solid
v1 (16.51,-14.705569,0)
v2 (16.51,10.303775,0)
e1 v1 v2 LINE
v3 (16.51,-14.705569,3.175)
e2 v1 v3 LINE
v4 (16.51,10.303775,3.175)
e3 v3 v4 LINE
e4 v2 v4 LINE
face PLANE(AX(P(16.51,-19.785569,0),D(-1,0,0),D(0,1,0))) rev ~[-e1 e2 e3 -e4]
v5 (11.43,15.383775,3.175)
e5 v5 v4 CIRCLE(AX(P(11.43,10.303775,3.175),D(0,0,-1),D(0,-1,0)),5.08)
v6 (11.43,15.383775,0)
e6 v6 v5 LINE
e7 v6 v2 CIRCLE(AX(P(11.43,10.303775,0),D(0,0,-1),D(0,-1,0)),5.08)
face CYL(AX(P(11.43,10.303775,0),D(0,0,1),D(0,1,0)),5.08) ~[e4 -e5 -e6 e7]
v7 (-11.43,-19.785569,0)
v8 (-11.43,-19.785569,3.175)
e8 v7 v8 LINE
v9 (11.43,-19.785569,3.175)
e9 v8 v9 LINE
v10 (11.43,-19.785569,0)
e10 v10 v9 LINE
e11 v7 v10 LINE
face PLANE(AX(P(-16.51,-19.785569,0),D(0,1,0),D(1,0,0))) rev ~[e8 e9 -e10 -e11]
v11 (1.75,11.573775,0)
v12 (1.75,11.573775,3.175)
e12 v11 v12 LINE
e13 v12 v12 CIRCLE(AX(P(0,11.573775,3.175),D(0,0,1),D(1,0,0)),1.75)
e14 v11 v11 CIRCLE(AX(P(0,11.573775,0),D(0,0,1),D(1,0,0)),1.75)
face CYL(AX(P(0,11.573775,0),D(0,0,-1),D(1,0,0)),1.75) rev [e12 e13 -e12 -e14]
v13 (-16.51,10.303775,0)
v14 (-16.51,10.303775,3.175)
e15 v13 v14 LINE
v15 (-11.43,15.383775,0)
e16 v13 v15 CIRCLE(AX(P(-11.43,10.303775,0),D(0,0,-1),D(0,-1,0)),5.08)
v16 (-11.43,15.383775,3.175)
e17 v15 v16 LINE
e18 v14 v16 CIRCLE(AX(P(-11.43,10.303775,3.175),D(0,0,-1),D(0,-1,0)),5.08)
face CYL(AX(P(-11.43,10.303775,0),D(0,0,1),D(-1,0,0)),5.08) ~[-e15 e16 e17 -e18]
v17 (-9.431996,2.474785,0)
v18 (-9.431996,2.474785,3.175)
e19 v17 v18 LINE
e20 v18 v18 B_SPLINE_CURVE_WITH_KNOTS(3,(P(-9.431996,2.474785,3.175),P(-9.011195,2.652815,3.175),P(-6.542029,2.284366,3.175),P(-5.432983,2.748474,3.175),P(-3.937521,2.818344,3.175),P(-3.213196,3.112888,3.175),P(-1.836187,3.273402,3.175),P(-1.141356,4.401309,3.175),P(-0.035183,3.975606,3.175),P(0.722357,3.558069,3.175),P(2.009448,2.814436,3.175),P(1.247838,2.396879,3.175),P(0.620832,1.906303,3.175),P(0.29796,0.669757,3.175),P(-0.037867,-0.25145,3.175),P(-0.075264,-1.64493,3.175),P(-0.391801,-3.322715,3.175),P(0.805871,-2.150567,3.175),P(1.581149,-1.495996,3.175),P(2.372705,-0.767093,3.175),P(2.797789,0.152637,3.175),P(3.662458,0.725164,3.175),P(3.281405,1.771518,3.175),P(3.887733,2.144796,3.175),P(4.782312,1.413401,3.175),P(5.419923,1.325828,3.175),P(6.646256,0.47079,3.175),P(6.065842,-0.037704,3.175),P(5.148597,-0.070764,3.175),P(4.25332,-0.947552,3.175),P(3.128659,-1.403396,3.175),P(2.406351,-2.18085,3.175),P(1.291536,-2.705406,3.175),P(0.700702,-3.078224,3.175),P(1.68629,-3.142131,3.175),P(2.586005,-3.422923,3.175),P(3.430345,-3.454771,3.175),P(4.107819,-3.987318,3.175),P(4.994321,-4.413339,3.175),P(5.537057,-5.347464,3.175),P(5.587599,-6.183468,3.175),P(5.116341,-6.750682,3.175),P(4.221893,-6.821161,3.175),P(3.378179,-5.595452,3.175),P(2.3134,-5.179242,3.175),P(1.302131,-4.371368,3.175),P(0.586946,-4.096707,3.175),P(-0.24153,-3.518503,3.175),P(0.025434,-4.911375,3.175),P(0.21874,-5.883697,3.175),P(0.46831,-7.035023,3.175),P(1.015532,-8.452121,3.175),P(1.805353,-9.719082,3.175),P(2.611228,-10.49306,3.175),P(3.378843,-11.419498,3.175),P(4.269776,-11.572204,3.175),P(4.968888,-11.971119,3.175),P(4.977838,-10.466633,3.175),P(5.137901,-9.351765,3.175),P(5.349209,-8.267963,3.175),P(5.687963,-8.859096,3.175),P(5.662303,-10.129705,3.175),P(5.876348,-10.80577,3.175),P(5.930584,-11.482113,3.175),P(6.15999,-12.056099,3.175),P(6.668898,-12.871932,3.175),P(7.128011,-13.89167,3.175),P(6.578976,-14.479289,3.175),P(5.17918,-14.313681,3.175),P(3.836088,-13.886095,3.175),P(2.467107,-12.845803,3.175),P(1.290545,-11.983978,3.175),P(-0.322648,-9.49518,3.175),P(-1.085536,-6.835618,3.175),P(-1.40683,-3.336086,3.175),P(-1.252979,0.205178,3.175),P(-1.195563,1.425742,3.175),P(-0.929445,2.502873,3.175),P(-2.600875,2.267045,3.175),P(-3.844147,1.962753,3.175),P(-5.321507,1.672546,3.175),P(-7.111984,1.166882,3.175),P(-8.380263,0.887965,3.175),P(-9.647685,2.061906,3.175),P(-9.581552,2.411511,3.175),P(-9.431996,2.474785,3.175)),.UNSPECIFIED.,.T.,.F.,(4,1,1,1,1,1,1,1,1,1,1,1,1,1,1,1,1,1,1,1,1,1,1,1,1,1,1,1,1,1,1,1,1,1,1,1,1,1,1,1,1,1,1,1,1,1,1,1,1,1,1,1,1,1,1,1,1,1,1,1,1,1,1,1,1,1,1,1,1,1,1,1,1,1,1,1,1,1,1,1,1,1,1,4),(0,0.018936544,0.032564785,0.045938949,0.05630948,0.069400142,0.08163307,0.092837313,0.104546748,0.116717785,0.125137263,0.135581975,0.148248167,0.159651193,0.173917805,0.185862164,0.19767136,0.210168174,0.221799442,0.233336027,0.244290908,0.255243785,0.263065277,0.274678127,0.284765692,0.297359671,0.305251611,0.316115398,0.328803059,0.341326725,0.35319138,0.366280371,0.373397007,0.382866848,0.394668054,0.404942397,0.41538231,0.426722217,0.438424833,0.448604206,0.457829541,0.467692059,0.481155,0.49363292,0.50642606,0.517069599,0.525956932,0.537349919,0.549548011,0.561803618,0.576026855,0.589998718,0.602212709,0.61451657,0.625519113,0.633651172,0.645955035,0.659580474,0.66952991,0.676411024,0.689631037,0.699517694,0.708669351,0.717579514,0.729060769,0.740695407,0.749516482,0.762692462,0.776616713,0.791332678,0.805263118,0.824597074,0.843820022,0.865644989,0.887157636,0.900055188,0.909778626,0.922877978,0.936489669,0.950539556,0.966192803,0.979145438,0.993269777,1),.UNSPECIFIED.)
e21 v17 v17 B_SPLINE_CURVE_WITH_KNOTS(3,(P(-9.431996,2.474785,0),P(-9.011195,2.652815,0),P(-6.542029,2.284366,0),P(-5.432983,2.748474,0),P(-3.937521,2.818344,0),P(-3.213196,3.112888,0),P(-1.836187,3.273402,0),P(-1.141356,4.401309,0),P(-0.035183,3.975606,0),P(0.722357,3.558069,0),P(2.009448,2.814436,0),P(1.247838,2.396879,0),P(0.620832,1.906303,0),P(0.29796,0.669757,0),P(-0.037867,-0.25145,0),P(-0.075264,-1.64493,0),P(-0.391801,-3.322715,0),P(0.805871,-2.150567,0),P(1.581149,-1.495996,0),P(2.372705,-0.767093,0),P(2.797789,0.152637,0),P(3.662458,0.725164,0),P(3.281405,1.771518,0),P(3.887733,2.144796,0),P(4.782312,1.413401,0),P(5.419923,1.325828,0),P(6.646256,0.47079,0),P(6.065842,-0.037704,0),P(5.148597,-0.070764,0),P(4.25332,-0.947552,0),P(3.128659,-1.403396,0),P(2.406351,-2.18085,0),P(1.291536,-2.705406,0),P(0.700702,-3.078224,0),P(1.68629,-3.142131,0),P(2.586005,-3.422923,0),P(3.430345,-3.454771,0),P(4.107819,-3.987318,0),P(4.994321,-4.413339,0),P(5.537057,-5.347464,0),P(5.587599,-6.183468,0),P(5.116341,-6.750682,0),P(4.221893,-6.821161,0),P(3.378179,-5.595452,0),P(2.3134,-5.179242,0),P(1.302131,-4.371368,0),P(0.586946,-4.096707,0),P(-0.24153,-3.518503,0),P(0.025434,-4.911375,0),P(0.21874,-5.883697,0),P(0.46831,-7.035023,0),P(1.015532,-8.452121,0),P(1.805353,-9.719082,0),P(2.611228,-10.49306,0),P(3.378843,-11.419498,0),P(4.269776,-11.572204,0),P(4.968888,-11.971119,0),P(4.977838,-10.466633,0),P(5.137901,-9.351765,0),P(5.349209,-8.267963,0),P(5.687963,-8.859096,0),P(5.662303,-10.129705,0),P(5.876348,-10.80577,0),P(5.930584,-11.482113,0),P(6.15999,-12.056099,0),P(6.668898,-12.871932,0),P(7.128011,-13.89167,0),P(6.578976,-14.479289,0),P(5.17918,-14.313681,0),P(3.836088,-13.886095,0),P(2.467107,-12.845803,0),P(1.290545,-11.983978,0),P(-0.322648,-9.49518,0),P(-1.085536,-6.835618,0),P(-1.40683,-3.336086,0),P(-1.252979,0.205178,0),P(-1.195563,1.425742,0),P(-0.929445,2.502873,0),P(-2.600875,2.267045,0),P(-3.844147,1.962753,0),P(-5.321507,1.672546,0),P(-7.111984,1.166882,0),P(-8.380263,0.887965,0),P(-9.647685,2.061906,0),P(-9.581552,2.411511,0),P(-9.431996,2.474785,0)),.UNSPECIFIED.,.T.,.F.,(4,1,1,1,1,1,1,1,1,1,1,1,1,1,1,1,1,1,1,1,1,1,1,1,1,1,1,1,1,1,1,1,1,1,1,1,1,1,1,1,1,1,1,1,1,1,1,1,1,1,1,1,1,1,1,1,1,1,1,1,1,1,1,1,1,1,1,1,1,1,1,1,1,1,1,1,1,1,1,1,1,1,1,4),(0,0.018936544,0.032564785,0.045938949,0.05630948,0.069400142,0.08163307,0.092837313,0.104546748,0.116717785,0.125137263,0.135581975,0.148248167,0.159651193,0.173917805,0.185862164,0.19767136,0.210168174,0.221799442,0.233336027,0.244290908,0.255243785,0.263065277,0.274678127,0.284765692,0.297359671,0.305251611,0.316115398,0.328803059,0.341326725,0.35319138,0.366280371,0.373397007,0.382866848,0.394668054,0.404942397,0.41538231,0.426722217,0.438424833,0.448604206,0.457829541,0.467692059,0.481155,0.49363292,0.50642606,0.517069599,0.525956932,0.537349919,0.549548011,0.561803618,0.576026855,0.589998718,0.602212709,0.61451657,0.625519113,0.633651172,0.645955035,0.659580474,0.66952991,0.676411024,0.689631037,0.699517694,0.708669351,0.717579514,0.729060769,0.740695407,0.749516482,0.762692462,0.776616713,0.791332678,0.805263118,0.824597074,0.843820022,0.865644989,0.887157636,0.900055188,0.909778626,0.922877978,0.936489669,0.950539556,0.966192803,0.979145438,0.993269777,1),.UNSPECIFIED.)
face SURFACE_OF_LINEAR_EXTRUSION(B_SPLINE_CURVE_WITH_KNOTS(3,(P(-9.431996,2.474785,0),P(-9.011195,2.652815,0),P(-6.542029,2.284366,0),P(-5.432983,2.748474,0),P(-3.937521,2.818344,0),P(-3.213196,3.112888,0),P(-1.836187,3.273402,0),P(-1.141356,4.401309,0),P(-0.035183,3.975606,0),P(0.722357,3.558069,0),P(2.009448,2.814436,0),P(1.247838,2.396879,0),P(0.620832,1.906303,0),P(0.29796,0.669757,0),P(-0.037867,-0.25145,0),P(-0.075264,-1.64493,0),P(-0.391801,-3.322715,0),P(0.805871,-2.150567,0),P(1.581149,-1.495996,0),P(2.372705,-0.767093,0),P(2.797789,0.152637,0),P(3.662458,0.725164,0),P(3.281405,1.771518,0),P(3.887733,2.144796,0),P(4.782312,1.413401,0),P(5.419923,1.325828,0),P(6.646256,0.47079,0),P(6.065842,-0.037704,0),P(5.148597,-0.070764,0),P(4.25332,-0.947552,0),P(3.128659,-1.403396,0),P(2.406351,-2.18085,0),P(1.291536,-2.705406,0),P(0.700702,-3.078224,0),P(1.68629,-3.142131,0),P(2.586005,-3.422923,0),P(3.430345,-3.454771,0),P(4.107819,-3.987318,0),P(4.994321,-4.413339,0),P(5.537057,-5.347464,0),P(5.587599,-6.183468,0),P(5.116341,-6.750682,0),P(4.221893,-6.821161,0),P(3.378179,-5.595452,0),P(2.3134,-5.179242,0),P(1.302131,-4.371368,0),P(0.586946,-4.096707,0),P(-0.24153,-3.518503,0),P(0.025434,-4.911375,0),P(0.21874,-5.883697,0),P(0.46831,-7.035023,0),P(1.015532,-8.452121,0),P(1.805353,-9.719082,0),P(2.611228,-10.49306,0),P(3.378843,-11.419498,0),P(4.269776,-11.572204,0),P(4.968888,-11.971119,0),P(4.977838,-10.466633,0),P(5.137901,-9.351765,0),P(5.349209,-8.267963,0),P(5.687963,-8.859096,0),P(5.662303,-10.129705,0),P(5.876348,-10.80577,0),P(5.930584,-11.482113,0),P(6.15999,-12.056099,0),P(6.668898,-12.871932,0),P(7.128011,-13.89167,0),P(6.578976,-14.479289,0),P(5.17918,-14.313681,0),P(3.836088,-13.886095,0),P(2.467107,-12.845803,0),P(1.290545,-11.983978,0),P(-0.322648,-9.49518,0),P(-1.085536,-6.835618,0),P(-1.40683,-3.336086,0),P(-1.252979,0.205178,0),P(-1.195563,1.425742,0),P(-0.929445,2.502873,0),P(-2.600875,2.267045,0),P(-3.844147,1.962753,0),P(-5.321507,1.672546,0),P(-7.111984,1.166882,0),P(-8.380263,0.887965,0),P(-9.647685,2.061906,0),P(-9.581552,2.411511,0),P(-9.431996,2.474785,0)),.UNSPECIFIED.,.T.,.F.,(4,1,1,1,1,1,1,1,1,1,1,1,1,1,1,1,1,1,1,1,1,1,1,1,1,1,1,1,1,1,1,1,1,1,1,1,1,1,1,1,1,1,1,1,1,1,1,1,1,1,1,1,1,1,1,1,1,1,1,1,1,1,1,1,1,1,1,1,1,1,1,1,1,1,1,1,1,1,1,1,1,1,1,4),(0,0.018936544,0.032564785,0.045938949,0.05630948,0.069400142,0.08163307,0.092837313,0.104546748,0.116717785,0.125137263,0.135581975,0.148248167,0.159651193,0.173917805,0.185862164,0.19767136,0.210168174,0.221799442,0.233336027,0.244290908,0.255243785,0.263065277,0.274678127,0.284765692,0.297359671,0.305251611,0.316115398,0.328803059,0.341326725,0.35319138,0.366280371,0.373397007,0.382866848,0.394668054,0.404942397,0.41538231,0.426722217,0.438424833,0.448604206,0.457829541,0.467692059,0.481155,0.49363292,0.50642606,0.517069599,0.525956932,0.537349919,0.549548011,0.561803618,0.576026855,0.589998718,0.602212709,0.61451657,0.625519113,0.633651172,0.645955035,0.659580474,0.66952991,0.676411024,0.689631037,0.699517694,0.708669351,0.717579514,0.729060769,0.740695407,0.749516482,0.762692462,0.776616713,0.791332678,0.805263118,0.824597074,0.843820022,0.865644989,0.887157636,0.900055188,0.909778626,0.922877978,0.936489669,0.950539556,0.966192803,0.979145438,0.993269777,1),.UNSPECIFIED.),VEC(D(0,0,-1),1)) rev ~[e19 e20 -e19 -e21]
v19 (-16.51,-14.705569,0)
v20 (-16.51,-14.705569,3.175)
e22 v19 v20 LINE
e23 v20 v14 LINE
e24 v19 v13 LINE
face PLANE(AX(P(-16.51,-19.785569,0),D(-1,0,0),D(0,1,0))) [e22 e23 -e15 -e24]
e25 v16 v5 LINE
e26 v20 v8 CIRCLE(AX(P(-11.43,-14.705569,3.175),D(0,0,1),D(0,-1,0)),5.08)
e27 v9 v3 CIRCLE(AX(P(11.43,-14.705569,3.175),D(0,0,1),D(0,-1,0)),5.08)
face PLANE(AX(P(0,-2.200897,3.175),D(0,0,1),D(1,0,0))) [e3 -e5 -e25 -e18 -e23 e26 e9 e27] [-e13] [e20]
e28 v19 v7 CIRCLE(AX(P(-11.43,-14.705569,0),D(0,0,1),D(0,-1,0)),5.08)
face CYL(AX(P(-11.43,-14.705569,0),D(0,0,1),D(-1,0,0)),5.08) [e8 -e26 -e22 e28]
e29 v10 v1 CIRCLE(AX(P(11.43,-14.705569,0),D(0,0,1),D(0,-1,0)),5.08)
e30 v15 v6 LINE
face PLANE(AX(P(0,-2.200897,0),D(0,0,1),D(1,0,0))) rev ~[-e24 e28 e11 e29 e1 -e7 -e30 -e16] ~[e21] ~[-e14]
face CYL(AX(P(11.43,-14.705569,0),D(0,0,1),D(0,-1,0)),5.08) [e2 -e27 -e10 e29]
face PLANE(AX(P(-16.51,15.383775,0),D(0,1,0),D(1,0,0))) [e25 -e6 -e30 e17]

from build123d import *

# Parameters (mm, degrees)
F0_W     = 33.02
F0_H     = 35.1693436827
F0_R     = 1.75
F1_DEPTH = 3.175
F2_R     = 5.08


# Not quite as in the source:
# - a length typed as a fraction of an inch, garbled in the dataset ("3 / 203.2 mm" for 3/8 in), is restored


with BuildPart() as f1:
    # F0 (on Top) → F1 (new body)
    with BuildSketch(Plane.XY):
        with Locations((0, -2.2008972981)):
            Rectangle(F0_W, F0_H)
        with BuildLine():
            add(Edge.make_bspline(
                [(-9.4319959171, 2.4747848511), (-9.0111951678, 2.6528150769), (-6.5420286212, 2.2843658382), (-5.432982901, 2.7484741152), (-3.9375209961, 2.8183442215), (-3.2131964743, 3.1128875067), (-1.8361873772, 3.2734017236), (-1.1413564618, 4.4013090624), (-0.0351827282, 3.9756058559), (0.7223566506, 3.5580686681), (2.0094481861, 2.8144364971), (1.2478384799, 2.3968788401), (0.6208315977, 1.9063029494), (0.2979602617, 0.6697569649), (-0.0378670296, -0.2514498532), (-0.0752641301, -1.6449301018), (-0.3918011166, -3.322715038), (0.8058707871, -2.1505667224), (1.5811492633, -1.4959958557), (2.3727052585, -0.7670925996), (2.7977889425, 0.1526365687), (3.6624575003, 0.7251640991), (3.2814054516, 1.7715175462), (3.8877330296, 2.1447957131), (4.7823119921, 1.4134010523), (5.4199230373, 1.3258275708), (6.6462564571, 0.4707896574), (6.0658415697, -0.0377041391), (5.1485968811, -0.0707641585), (4.2533202076, -0.9475520476), (3.1286591677, -1.4033959186), (2.4063505352, -2.1808497402), (1.2915356323, -2.7054057367), (0.7007021955, -3.0782236496), (1.6862899937, -3.1421314569), (2.5860051488, -3.4229230494), (3.4303451538, -3.4547709277), (4.1078186324, -3.9873182091), (4.9943210875, -4.4133386079), (5.5370569458, -5.3474644367), (5.5875986737, -6.1834682659), (5.1163406773, -6.7506822602), (4.2218926973, -6.8211608476), (3.3781787786, -5.5954521122), (2.3133999422, -5.1792415472), (1.3021307027, -4.371368088), (0.5869458676, -4.0967072239), (-0.2415296419, -3.5185027211), (0.0254337467, -4.9113753534), (0.2187395242, -5.8836971725), (0.4683101692, -7.0350230724), (1.0155320882, -8.4521214167), (1.8053528665, -9.7190821874), (2.6112277996, -10.4930600568), (3.3788434637, -11.4194979787), (4.2697760077, -11.5722040285), (4.9688883551, -11.9711185553), (4.9778375148, -10.4666334437), (5.1379009584, -9.3517649157), (5.3492086846, -8.2679630049), (5.6879632618, -8.8590961582), (5.6623031639, -10.1297052588), (5.876347914, -10.8057701866), (5.9305841218, -11.4821127168), (6.1599895506, -12.0560992681), (6.6688984024, -12.8719323516), (7.1280114884, -13.8916699049), (6.5789762839, -14.4792894131), (5.1791795821, -14.313681002), (3.8360875816, -13.8860948059), (2.4671065748, -12.8458030116), (1.2905447565, -11.9839779965), (-0.3226479084, -9.4951800922), (-1.0855364921, -6.8356179824), (-1.4068296839, -3.3360864189), (-1.25297891, 0.205177533), (-1.195563285, 1.4257421625), (-0.9294454092, 2.5028732366), (-2.6008753034, 2.2670452306), (-3.8441473874, 1.9627525444), (-5.3215074167, 1.6725461409), (-7.111984113, 1.1668815666), (-8.3802630012, 0.8879654929), (-9.6476847595, 2.0619057335), (-9.5815524094, 2.4115112563), (-9.4319959171, 2.4747848511)],
                knots=[0, 0, 0, 0, 0.0189365441, 0.0325647847, 0.0459389493, 0.0563094801, 0.069400142, 0.0816330701, 0.0928373129, 0.1045467479, 0.1167177849, 0.1251372634, 0.1355819751, 0.1482481673, 0.1596511929, 0.173917805, 0.1858621643, 0.1976713601, 0.2101681736, 0.2217994419, 0.2333360267, 0.2442909078, 0.2552437853, 0.2630652769, 0.2746781275, 0.2847656921, 0.2973596713, 0.3052516113, 0.3161153975, 0.328803059, 0.3413267252, 0.3531913798, 0.3662803707, 0.3733970069, 0.3828668483, 0.3946680539, 0.404942397, 0.4153823096, 0.4267222172, 0.4384248333, 0.4486042055, 0.4578295412, 0.4676920592, 0.4811550001, 0.49363292, 0.5064260602, 0.5170695995, 0.525956932, 0.5373499186, 0.5495480112, 0.5618036181, 0.5760268553, 0.5899987178, 0.6022127091, 0.6145165705, 0.6255191126, 0.6336511724, 0.6459550345, 0.6595804739, 0.6695299103, 0.6764110238, 0.6896310371, 0.6995176936, 0.708669351, 0.7175795141, 0.7290607694, 0.7406954074, 0.7495164821, 0.7626924615, 0.7766167131, 0.7913326778, 0.8052631184, 0.8245970741, 0.8438200219, 0.8656449894, 0.8871576356, 0.9000551877, 0.909778626, 0.922877978, 0.9364896693, 0.9505395564, 0.966192803, 0.9791454377, 0.9932697765, 1, 1, 1, 1], degree=3))
        make_face(mode=Mode.SUBTRACT)
        with Locations((0, 11.5737745433)):
            Circle(F0_R, mode=Mode.SUBTRACT)
    extrude(amount=F1_DEPTH)

    # F2
    f2_edges = [f1.edges().sort_by_distance(p)[0] for p in [
        (-16.51, 15.383775, 1.5875),
        (16.51, 15.383775, 1.5875),
        (16.51, -19.785569, 1.5875),
        (-16.51, -19.785569, 1.5875),
    ]]
    fillet(f2_edges, radius=F2_R)


solid = f1.part
